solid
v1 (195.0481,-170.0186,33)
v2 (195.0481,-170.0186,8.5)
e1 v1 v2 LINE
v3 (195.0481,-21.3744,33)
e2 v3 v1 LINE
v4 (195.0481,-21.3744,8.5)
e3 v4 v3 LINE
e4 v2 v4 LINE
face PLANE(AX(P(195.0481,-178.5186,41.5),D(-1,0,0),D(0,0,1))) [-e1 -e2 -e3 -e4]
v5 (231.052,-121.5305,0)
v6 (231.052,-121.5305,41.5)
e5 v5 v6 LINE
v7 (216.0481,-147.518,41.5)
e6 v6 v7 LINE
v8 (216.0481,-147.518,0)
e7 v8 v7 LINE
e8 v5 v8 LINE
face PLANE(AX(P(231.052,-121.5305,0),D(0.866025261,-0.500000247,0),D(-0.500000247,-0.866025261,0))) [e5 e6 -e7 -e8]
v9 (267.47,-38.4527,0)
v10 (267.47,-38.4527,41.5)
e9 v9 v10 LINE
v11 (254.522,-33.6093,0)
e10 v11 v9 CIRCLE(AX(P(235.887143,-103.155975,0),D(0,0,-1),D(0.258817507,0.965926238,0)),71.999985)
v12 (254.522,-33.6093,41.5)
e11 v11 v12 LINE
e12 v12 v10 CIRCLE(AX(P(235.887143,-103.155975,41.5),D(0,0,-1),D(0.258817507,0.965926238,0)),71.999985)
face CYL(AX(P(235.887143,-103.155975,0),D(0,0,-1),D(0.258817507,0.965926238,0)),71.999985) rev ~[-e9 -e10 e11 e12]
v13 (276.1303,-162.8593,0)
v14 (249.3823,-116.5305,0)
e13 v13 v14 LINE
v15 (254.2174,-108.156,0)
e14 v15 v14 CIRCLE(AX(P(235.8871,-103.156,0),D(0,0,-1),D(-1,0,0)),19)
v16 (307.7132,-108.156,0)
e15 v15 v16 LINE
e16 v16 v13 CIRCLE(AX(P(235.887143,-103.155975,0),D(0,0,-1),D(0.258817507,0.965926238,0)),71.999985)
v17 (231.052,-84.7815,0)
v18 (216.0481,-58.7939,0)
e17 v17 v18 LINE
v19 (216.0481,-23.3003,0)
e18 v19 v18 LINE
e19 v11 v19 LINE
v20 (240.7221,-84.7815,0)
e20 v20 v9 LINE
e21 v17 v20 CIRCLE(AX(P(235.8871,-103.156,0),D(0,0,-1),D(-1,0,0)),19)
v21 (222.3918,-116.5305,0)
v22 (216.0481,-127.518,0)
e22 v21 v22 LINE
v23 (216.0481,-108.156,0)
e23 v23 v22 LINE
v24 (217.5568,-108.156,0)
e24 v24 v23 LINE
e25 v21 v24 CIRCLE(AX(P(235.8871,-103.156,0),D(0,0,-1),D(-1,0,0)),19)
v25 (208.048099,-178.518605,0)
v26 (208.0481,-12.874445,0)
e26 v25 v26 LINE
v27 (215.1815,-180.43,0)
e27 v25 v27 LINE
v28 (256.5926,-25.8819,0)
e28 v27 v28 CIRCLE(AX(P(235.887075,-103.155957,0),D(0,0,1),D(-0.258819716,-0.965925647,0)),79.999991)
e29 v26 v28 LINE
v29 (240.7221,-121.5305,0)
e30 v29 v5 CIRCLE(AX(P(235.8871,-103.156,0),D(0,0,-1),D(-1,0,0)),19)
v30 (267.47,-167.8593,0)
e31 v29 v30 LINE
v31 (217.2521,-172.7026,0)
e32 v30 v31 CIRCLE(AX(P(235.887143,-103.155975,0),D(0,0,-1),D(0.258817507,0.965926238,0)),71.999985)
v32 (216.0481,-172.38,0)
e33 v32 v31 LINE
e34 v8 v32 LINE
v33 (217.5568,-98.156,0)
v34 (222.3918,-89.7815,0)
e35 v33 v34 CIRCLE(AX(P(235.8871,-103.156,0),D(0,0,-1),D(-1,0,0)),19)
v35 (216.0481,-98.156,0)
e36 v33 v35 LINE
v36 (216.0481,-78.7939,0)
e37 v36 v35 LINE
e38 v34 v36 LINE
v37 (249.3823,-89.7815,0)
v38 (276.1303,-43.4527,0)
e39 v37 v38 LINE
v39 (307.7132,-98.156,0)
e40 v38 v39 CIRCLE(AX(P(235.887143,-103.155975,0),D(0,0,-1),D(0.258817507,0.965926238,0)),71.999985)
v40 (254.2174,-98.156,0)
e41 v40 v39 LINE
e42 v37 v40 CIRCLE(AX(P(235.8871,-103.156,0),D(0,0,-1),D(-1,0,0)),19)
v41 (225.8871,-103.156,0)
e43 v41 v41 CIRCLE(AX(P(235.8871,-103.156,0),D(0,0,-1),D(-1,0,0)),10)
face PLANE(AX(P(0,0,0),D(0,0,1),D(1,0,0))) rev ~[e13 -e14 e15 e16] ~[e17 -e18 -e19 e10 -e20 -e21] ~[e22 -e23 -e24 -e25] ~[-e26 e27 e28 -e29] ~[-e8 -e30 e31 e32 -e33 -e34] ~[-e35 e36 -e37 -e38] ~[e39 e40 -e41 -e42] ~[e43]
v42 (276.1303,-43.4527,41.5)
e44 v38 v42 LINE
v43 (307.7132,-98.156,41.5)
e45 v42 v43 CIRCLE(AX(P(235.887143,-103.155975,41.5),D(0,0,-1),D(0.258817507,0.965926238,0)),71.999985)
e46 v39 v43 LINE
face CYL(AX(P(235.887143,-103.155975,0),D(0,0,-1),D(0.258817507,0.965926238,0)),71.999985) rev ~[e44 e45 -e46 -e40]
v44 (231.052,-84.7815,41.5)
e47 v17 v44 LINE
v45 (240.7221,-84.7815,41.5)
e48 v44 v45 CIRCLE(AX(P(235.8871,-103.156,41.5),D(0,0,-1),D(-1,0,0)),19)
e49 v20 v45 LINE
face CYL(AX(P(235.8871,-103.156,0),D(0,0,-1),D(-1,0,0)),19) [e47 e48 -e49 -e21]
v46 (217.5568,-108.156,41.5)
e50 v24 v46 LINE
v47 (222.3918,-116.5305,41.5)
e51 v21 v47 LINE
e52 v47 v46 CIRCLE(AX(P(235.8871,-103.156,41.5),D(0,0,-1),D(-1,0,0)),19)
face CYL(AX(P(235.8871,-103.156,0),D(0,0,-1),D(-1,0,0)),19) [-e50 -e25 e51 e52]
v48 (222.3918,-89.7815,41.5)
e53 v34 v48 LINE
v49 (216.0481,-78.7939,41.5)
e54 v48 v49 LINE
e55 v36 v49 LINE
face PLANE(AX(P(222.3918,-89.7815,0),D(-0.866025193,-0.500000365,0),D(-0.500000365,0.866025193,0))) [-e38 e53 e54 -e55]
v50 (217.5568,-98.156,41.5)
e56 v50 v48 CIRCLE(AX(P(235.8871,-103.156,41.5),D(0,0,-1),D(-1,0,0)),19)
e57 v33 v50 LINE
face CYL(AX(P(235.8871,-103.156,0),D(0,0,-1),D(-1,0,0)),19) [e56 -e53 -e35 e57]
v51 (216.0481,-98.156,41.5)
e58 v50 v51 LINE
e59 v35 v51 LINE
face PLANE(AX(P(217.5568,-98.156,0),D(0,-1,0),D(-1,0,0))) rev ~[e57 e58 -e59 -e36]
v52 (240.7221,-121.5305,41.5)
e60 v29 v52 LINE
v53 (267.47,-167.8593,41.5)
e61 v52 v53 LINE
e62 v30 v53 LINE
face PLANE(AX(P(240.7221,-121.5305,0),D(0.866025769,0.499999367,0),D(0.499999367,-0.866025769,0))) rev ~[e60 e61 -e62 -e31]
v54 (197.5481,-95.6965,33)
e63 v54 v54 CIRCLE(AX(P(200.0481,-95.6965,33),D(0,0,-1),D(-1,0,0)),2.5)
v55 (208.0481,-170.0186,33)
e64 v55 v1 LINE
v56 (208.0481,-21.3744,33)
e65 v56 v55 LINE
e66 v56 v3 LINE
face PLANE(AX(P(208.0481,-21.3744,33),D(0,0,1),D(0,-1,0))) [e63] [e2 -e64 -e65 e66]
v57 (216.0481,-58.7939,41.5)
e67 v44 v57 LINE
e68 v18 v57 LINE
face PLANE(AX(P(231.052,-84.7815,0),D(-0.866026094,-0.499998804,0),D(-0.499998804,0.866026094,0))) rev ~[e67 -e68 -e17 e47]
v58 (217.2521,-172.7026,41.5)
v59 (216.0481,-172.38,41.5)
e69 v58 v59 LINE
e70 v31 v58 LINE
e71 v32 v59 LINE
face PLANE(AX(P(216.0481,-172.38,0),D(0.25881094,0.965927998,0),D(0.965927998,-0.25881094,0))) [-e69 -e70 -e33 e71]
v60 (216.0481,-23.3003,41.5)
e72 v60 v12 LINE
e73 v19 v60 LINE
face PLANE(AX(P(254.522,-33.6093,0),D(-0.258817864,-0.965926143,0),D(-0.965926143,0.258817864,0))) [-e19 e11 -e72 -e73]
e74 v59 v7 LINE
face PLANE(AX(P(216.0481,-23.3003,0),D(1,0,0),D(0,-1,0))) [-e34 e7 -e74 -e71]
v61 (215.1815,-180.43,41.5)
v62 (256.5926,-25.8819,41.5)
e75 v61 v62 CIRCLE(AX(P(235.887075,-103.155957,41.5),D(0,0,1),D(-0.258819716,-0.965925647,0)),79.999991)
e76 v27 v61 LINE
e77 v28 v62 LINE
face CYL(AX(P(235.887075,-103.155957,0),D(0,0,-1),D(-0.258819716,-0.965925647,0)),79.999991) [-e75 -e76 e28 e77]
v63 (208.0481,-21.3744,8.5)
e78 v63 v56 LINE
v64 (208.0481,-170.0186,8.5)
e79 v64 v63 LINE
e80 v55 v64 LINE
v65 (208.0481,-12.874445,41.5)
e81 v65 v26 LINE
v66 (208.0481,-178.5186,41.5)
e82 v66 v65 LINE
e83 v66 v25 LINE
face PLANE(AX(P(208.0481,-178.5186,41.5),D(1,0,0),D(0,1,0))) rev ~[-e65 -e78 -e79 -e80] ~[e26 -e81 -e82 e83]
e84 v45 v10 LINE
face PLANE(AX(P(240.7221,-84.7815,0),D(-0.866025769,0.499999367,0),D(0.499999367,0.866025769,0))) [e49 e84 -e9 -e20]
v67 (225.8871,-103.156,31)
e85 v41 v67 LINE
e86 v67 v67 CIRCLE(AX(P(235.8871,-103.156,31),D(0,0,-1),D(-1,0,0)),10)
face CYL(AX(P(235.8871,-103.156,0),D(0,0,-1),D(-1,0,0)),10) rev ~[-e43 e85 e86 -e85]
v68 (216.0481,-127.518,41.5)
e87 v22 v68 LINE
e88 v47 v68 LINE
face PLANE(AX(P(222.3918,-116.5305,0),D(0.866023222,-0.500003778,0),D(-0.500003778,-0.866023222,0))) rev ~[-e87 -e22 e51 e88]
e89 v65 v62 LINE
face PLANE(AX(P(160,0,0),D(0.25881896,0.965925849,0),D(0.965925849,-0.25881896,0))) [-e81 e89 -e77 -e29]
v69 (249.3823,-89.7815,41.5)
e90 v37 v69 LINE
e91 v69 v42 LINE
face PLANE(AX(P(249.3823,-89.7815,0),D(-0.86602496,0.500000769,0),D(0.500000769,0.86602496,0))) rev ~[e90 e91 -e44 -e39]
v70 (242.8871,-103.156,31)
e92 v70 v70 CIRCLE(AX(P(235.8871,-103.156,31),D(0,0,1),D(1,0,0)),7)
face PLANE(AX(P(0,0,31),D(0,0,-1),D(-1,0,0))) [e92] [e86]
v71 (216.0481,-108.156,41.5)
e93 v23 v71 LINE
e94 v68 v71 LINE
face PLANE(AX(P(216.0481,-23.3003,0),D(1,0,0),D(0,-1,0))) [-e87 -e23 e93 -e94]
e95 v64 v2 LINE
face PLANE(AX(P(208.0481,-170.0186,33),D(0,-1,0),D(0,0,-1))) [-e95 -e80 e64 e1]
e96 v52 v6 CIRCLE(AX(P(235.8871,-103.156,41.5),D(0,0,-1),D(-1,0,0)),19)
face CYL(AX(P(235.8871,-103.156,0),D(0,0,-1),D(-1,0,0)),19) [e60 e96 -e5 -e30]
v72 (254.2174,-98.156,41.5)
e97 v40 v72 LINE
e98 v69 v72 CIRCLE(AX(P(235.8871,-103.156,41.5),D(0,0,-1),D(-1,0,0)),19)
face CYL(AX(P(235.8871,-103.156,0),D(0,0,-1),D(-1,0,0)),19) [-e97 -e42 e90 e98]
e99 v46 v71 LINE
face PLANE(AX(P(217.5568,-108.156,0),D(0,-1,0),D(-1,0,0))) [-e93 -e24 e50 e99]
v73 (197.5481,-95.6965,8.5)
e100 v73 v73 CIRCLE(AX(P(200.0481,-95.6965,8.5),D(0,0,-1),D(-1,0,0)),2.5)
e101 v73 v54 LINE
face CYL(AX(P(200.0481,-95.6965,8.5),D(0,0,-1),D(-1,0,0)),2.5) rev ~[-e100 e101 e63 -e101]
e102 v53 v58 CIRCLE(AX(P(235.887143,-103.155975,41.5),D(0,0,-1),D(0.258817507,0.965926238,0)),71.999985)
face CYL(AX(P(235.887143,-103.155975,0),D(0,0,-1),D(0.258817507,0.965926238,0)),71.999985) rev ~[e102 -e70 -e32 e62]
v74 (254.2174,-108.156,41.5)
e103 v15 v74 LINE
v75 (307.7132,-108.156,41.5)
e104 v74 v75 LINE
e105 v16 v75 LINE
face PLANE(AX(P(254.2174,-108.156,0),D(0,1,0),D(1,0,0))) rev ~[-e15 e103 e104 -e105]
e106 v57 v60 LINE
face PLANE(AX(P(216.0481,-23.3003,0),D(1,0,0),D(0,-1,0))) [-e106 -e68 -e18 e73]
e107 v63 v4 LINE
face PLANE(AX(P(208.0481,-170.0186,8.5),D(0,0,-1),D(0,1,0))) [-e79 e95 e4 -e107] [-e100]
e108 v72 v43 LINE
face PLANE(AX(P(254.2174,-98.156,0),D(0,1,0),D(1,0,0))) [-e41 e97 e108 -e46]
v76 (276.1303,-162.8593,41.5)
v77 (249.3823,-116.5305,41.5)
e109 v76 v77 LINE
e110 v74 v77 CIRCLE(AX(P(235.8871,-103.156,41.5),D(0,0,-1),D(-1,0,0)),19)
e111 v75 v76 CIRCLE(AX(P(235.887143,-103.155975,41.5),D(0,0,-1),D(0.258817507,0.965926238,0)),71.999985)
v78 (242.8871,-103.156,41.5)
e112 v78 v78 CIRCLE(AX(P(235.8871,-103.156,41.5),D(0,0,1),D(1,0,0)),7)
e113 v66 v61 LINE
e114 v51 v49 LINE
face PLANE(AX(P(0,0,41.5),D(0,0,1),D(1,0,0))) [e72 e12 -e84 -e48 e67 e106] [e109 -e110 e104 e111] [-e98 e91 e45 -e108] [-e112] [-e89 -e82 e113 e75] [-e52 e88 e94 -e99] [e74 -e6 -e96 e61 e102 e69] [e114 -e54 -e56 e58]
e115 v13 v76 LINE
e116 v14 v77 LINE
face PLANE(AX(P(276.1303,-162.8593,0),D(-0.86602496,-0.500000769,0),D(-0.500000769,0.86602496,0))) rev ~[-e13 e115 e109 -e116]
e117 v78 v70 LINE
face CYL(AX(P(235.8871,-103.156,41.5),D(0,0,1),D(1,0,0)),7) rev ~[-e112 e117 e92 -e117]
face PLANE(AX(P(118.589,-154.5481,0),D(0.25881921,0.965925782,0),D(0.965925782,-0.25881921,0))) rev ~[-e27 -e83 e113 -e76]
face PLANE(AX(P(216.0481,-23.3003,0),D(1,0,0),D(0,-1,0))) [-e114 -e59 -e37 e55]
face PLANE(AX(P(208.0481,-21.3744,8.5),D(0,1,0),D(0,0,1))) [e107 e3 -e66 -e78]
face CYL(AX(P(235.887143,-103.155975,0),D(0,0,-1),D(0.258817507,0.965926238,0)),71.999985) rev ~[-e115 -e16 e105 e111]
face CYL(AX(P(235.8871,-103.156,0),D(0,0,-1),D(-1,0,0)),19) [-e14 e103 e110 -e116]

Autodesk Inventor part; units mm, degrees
ref_plane "YZ Plane" through (0, 0, 0) normal (1, 0, 0) x (0, 1, 0)
ref_plane "XZ Plane" through (0, 0, 0) normal (0, 1, 0) x (-1, 0, 0)
ref_plane "XY Plane" through (0, 0, 0) normal (0, 0, 1) x (1, 0, 0)
sketch "Sketch1" plane through (0, 0, 0) normal (0, 0, 1) x (1, 0, 0)
  line L0 (0, 0) -> (160, 0)
  line L1 (160, 0) -> (118.589, -154.5481) construction
  line L2 (0, 0) -> (41.411, -154.5481) construction
  line L3 (41.411, -154.5481) -> (118.589, -154.5481)
  circle A0 centre (235.8871, -103.156) radius 80 construction
  line L4 (160, 0) -> (256.5926, -25.8819)
  line L5 (118.589, -154.5481) -> (215.1815, -180.43)
  arc A1 (215.1815, -180.43) -> (256.5926, -25.8819) centre (235.8871, -103.156) ccw
  circle A2 centre (-75.8871, -103.156) radius 80 construction
  line L6 (0, 0) -> (-96.5926, -25.8819)
  line L7 (41.411, -154.5481) -> (-55.1815, -180.43)
  arc A3 (-96.5926, -25.8819) -> (-55.1815, -180.43) centre (-75.8871, -103.156) ccw
  dimension "d0" = 160
  dimension "d1" = 160
  dimension "d2" = 160
  dimension "d3" = 75
  dimension "d4" = 75
  dimension "d5" = 160
  dimension "d6" = 100
  dimension "d7" = 160
  dimension "d9" = 100
extrude "Extrusion1" add sketch "Sketch1" along normal blind 41.5
sketch "Sketch2" plane through (0, 0, 41.5) normal (0, 0, 1) x (1, 0, 0)
  line L0 (-26.5, -133) -> (186.5, -133)
  line L1 (186.5, -133) -> (186.5, -20)
  line L2 (186.5, -20) -> (-26.5, -20)
  line L3 (-26.5, -20) -> (-26.5, -133)
  line L4 (160, 0) -> (0, 0) projected
  point P0 (80, -20)
  point P1 (80, 0)
  dimension "d12" = 213
  dimension "d13" = 113
  dimension "d14" = 20
extrude "Extrusion2" cut sketch "Sketch2" against normal through all
sketch "Sketch3" plane through (0, 0, 41.5) normal (0, 0, 1) x (1, 0, 0)
  line L0 (-26.5, -133) -> (-26.5, -20) construction
  line L1 (-26.5, -20) -> (186.5, -20) construction
  line L2 (186.5, -20) -> (186.5, -133) construction
  line L3 (186.5, -133) -> (-26.5, -133) construction
  line L4 (-48.0481, 1.5481) -> (-48.0481, -154.5481) construction
  line L5 (-48.0481, -154.5481) -> (208.0481, -154.5481) construction
  line L6 (208.0481, -154.5481) -> (208.0481, 1.5481) construction
  line L7 (208.0481, 1.5481) -> (-48.0481, 1.5481) construction
  line L8 (41.411, -154.5481) -> (118.589, -154.5481) construction
  line L9 (-48.0481, 1.5481) -> (-48.0481, -178.5186) construction
  line L10 (-55.1815, -180.43) -> (41.411, -154.5481) construction
  line L11 (208.0481, 1.5481) -> (208.0481, -178.5186) construction
  line L12 (118.589, -154.5481) -> (215.1815, -180.43) construction
  line L13 (-48.0481, -178.5186) -> (208.0481, -178.5186) construction
  line L14 (-48.0481, 1.5481) -> (208.0481, 1.5481) construction
  line L15 (160, 0) -> (256.5926, -25.8819) construction
  line L16 (208.2963, -12.941) -> (208.0481, -178.5186)
  line L17 (208.2963, -12.941) -> (256.5926, -25.8819)
  line L18 (208.0481, -178.5186) -> (215.1815, -180.43)
  arc A0 (215.1815, -180.43) -> (256.5926, -25.8819) centre (235.8871, -103.156) ccw
  line L19 (208.0481, 1.5481) -> (-166.9519, 1.5481)
  line L20 (-166.9519, 1.5481) -> (-166.9519, -188.4519)
  line L21 (-166.9519, -188.4519) -> (208.0481, -188.4519)
  line L22 (208.0481, -188.4519) -> (208.0481, 1.5481)
  point P0 (0, 0)
  point P1 (80, -154.5481)
  dimension "d17" = 190
  dimension "d18" = 375
extrude "Extrusion3" cut sketch "Sketch3" against normal through all contours L22 L21 L20 L19
sketch "Sketch4" plane through (0, 0, 41.5) normal (0, 0, 1) x (1, 0, 0)
  arc A0 (215.1815, -180.43) -> (256.5926, -25.8819) centre (235.8871, -103.156) ccw projected
  circle A1 centre (235.8871, -103.156) radius 7
  point P0 (0, 0)
  dimension "d21" = 14
extrude "Extrusion4" cut sketch "Sketch4" against normal through all
sketch "Sketch5" plane through (208.0481, -178.5186, 41.5) normal (-1, 0, 0) x (0, 0, 1)
  line L0 (-41.5, 165.6442) -> (0, 165.6442) projected
  line L1 (-41.5, 0) -> (-41.5, 165.6442) projected
  line L2 (0, 0) -> (-41.5, 0) projected
  line L3 (0, 165.6442) -> (0, 0) projected
  line L4 (-33, 157.1442) -> (-8.5, 157.1442)
  line L5 (-8.5, 157.1442) -> (-8.5, 8.5)
  line L6 (-8.5, 8.5) -> (-33, 8.5)
  line L7 (-33, 8.5) -> (-33, 157.1442)
  point P0 (-41.5, 178.5186)
  dimension "d24" = 8.5
extrude "Extrusion5" add sketch "Sketch5" along normal blind 13 contours L4 L5 L6 L7
sketch "Sketch6" plane through (208.0481, -170.0186, 8.5) normal (0, 0, -1) x (-1, 0, 0)
  circle A0 centre (8, 74.3221) radius 2.5
  line L0 (0, -8.5) -> (0, 157.1442) projected
  point P0 (208.0481, 170.0186)
  point P1 (0, 74.3221)
  dimension "d27" = 5
  dimension "d28" = 8
extrude "Extrusion6" cut sketch "Sketch6" against normal through all
sketch "Sketch7" plane through (0, 0, 0) normal (0, 0, -1) x (-1, 0, 0)
  circle A0 centre (-235.8871, -103.156) radius 7 projected
  line L0 (-208.0481, -178.5186) -> (-208.0481, -12.8745) projected
  line L1 (-208.0481, -12.8745) -> (-256.5926, -25.8819) projected
  arc A1 (-256.5926, -25.8819) -> (-215.1815, -180.43) centre (-235.8871, -103.156) ccw projected
  line L2 (-215.1815, -180.43) -> (-208.0481, -178.5186) projected
  line L3 (-254.522, -33.6093) -> (-216.0481, -23.3003)
  line L4 (-216.0481, -23.3003) -> (-216.0481, -172.38)
  line L5 (-216.0481, -172.38) -> (-217.2521, -172.7026)
  arc A2 (-254.522, -33.6093) -> (-217.2521, -172.7026) centre (-235.8871, -103.156) ccw
  circle A3 centre (-235.8871, -103.156) radius 19
  point P0 (0, 0)
  dimension "d31" = 8
  dimension "d32" = 12
extrude "Extrusion7" cut sketch "Sketch7" against normal through all contours L3 L4 L5 A2
sketch "Sketch8" plane through (0, 0, 0) normal (0, 0, -1) x (-1, 0, 0)
  circle A0 centre (-235.8871, -103.156) radius 7 construction
  circle A1 centre (-235.8871, -103.156) radius 19 construction
  line L0 (-235.8871, -103.156) -> (-159.7277, -103.156) construction
  line L1 (-217.5568, -98.156) -> (-123.6167, -98.156) construction
  line L2 (-217.5568, -108.156) -> (-123.6167, -108.156) construction
  line L3 (-231.052, -84.7815) -> (-184.082, -3.427) construction
  line L4 (-222.3918, -89.7815) -> (-175.4217, -8.427) construction
  line L5 (-249.3823, -89.7815) -> (-296.3524, -8.427) construction
  line L6 (-240.7221, -84.7815) -> (-287.6921, -3.427) construction
  line L7 (-254.2174, -108.156) -> (-348.1575, -108.156) construction
  line L8 (-254.2174, -98.156) -> (-348.1575, -98.156) construction
  line L9 (-240.7221, -121.5305) -> (-287.6921, -202.885) construction
  line L10 (-249.3823, -116.5305) -> (-296.3524, -197.885) construction
  line L11 (-222.3918, -116.5305) -> (-175.4217, -197.885) construction
  line L12 (-231.052, -121.5305) -> (-184.082, -202.885) construction
  line L13 (-216.0481, -23.3003) -> (-216.0481, -172.38) construction
  arc A2 (-254.522, -33.6093) -> (-217.2521, -172.7026) centre (-235.8871, -103.156) ccw construction
  line L14 (-254.522, -33.6093) -> (-216.0481, -23.3003) construction
  line L15 (-216.0481, -172.38) -> (-217.2521, -172.7026) construction
  line L16 (-217.5568, -98.156) -> (-216.0481, -98.156)
  line L17 (-217.5568, -108.156) -> (-216.0481, -108.156)
  line L18 (-222.3918, -116.5305) -> (-216.0481, -127.518)
  line L19 (-231.052, -121.5305) -> (-216.0481, -147.518)
  line L20 (-240.7221, -121.5305) -> (-267.47, -167.8593)
  line L21 (-276.1303, -162.8593) -> (-249.3823, -116.5305)
  line L22 (-254.2174, -108.156) -> (-307.7132, -108.156)
  line L23 (-254.2174, -98.156) -> (-307.7132, -98.156)
  line L24 (-249.3823, -89.7815) -> (-276.1303, -43.4527)
  line L25 (-240.7221, -84.7815) -> (-267.47, -38.4527)
  line L26 (-231.052, -84.7815) -> (-216.0481, -58.7939)
  line L27 (-222.3918, -89.7815) -> (-216.0481, -78.7939)
  line L28 (-216.0481, -58.7939) -> (-216.0481, -78.7939)
  line L29 (-216.0481, -98.156) -> (-216.0481, -108.156)
  line L30 (-216.0481, -127.518) -> (-216.0481, -147.518)
  arc A3 (-267.47, -38.4527) -> (-276.1303, -43.4527) centre (-235.8871, -103.156) ccw
  arc A4 (-307.7132, -98.156) -> (-307.7132, -108.156) centre (-235.8871, -103.156) ccw
  arc A5 (-276.1303, -162.8593) -> (-267.47, -167.8593) centre (-235.8871, -103.156) ccw
  arc A6 (-217.5568, -108.156) -> (-217.5568, -98.156) centre (-235.8871, -103.156) ccw
  arc A7 (-231.052, -121.5305) -> (-222.3918, -116.5305) centre (-235.8871, -103.156) ccw
  arc A8 (-249.3823, -116.5305) -> (-240.7221, -121.5305) centre (-235.8871, -103.156) ccw
  arc A9 (-254.2174, -98.156) -> (-254.2174, -108.156) centre (-235.8871, -103.156) ccw
  arc A10 (-240.7221, -84.7815) -> (-249.3823, -89.7815) centre (-235.8871, -103.156) ccw
  arc A11 (-222.3918, -89.7815) -> (-231.052, -84.7815) centre (-235.8871, -103.156) ccw
  point P0 (0, 0)
  dimension "d36" = 5
  dimension "d37" = 5
  dimension "d40" = 360
extrude "Extrusion8" add sketch "Sketch8" against normal blind 41.5
sketch "Sketch9" plane through (0, 0, 0) normal (0, 0, -1) x (-1, 0, 0)
  circle A0 centre (-235.8871, -103.156) radius 7 projected
  circle A1 centre (-235.8871, -103.156) radius 10
  point P0 (0, 0)
  dimension "d46" = 20
extrude "Extrusion9" cut sketch "Sketch9" against normal blind 31 contours A0 | A1
properties part number "Riser Base" material "ABS Plastic"
